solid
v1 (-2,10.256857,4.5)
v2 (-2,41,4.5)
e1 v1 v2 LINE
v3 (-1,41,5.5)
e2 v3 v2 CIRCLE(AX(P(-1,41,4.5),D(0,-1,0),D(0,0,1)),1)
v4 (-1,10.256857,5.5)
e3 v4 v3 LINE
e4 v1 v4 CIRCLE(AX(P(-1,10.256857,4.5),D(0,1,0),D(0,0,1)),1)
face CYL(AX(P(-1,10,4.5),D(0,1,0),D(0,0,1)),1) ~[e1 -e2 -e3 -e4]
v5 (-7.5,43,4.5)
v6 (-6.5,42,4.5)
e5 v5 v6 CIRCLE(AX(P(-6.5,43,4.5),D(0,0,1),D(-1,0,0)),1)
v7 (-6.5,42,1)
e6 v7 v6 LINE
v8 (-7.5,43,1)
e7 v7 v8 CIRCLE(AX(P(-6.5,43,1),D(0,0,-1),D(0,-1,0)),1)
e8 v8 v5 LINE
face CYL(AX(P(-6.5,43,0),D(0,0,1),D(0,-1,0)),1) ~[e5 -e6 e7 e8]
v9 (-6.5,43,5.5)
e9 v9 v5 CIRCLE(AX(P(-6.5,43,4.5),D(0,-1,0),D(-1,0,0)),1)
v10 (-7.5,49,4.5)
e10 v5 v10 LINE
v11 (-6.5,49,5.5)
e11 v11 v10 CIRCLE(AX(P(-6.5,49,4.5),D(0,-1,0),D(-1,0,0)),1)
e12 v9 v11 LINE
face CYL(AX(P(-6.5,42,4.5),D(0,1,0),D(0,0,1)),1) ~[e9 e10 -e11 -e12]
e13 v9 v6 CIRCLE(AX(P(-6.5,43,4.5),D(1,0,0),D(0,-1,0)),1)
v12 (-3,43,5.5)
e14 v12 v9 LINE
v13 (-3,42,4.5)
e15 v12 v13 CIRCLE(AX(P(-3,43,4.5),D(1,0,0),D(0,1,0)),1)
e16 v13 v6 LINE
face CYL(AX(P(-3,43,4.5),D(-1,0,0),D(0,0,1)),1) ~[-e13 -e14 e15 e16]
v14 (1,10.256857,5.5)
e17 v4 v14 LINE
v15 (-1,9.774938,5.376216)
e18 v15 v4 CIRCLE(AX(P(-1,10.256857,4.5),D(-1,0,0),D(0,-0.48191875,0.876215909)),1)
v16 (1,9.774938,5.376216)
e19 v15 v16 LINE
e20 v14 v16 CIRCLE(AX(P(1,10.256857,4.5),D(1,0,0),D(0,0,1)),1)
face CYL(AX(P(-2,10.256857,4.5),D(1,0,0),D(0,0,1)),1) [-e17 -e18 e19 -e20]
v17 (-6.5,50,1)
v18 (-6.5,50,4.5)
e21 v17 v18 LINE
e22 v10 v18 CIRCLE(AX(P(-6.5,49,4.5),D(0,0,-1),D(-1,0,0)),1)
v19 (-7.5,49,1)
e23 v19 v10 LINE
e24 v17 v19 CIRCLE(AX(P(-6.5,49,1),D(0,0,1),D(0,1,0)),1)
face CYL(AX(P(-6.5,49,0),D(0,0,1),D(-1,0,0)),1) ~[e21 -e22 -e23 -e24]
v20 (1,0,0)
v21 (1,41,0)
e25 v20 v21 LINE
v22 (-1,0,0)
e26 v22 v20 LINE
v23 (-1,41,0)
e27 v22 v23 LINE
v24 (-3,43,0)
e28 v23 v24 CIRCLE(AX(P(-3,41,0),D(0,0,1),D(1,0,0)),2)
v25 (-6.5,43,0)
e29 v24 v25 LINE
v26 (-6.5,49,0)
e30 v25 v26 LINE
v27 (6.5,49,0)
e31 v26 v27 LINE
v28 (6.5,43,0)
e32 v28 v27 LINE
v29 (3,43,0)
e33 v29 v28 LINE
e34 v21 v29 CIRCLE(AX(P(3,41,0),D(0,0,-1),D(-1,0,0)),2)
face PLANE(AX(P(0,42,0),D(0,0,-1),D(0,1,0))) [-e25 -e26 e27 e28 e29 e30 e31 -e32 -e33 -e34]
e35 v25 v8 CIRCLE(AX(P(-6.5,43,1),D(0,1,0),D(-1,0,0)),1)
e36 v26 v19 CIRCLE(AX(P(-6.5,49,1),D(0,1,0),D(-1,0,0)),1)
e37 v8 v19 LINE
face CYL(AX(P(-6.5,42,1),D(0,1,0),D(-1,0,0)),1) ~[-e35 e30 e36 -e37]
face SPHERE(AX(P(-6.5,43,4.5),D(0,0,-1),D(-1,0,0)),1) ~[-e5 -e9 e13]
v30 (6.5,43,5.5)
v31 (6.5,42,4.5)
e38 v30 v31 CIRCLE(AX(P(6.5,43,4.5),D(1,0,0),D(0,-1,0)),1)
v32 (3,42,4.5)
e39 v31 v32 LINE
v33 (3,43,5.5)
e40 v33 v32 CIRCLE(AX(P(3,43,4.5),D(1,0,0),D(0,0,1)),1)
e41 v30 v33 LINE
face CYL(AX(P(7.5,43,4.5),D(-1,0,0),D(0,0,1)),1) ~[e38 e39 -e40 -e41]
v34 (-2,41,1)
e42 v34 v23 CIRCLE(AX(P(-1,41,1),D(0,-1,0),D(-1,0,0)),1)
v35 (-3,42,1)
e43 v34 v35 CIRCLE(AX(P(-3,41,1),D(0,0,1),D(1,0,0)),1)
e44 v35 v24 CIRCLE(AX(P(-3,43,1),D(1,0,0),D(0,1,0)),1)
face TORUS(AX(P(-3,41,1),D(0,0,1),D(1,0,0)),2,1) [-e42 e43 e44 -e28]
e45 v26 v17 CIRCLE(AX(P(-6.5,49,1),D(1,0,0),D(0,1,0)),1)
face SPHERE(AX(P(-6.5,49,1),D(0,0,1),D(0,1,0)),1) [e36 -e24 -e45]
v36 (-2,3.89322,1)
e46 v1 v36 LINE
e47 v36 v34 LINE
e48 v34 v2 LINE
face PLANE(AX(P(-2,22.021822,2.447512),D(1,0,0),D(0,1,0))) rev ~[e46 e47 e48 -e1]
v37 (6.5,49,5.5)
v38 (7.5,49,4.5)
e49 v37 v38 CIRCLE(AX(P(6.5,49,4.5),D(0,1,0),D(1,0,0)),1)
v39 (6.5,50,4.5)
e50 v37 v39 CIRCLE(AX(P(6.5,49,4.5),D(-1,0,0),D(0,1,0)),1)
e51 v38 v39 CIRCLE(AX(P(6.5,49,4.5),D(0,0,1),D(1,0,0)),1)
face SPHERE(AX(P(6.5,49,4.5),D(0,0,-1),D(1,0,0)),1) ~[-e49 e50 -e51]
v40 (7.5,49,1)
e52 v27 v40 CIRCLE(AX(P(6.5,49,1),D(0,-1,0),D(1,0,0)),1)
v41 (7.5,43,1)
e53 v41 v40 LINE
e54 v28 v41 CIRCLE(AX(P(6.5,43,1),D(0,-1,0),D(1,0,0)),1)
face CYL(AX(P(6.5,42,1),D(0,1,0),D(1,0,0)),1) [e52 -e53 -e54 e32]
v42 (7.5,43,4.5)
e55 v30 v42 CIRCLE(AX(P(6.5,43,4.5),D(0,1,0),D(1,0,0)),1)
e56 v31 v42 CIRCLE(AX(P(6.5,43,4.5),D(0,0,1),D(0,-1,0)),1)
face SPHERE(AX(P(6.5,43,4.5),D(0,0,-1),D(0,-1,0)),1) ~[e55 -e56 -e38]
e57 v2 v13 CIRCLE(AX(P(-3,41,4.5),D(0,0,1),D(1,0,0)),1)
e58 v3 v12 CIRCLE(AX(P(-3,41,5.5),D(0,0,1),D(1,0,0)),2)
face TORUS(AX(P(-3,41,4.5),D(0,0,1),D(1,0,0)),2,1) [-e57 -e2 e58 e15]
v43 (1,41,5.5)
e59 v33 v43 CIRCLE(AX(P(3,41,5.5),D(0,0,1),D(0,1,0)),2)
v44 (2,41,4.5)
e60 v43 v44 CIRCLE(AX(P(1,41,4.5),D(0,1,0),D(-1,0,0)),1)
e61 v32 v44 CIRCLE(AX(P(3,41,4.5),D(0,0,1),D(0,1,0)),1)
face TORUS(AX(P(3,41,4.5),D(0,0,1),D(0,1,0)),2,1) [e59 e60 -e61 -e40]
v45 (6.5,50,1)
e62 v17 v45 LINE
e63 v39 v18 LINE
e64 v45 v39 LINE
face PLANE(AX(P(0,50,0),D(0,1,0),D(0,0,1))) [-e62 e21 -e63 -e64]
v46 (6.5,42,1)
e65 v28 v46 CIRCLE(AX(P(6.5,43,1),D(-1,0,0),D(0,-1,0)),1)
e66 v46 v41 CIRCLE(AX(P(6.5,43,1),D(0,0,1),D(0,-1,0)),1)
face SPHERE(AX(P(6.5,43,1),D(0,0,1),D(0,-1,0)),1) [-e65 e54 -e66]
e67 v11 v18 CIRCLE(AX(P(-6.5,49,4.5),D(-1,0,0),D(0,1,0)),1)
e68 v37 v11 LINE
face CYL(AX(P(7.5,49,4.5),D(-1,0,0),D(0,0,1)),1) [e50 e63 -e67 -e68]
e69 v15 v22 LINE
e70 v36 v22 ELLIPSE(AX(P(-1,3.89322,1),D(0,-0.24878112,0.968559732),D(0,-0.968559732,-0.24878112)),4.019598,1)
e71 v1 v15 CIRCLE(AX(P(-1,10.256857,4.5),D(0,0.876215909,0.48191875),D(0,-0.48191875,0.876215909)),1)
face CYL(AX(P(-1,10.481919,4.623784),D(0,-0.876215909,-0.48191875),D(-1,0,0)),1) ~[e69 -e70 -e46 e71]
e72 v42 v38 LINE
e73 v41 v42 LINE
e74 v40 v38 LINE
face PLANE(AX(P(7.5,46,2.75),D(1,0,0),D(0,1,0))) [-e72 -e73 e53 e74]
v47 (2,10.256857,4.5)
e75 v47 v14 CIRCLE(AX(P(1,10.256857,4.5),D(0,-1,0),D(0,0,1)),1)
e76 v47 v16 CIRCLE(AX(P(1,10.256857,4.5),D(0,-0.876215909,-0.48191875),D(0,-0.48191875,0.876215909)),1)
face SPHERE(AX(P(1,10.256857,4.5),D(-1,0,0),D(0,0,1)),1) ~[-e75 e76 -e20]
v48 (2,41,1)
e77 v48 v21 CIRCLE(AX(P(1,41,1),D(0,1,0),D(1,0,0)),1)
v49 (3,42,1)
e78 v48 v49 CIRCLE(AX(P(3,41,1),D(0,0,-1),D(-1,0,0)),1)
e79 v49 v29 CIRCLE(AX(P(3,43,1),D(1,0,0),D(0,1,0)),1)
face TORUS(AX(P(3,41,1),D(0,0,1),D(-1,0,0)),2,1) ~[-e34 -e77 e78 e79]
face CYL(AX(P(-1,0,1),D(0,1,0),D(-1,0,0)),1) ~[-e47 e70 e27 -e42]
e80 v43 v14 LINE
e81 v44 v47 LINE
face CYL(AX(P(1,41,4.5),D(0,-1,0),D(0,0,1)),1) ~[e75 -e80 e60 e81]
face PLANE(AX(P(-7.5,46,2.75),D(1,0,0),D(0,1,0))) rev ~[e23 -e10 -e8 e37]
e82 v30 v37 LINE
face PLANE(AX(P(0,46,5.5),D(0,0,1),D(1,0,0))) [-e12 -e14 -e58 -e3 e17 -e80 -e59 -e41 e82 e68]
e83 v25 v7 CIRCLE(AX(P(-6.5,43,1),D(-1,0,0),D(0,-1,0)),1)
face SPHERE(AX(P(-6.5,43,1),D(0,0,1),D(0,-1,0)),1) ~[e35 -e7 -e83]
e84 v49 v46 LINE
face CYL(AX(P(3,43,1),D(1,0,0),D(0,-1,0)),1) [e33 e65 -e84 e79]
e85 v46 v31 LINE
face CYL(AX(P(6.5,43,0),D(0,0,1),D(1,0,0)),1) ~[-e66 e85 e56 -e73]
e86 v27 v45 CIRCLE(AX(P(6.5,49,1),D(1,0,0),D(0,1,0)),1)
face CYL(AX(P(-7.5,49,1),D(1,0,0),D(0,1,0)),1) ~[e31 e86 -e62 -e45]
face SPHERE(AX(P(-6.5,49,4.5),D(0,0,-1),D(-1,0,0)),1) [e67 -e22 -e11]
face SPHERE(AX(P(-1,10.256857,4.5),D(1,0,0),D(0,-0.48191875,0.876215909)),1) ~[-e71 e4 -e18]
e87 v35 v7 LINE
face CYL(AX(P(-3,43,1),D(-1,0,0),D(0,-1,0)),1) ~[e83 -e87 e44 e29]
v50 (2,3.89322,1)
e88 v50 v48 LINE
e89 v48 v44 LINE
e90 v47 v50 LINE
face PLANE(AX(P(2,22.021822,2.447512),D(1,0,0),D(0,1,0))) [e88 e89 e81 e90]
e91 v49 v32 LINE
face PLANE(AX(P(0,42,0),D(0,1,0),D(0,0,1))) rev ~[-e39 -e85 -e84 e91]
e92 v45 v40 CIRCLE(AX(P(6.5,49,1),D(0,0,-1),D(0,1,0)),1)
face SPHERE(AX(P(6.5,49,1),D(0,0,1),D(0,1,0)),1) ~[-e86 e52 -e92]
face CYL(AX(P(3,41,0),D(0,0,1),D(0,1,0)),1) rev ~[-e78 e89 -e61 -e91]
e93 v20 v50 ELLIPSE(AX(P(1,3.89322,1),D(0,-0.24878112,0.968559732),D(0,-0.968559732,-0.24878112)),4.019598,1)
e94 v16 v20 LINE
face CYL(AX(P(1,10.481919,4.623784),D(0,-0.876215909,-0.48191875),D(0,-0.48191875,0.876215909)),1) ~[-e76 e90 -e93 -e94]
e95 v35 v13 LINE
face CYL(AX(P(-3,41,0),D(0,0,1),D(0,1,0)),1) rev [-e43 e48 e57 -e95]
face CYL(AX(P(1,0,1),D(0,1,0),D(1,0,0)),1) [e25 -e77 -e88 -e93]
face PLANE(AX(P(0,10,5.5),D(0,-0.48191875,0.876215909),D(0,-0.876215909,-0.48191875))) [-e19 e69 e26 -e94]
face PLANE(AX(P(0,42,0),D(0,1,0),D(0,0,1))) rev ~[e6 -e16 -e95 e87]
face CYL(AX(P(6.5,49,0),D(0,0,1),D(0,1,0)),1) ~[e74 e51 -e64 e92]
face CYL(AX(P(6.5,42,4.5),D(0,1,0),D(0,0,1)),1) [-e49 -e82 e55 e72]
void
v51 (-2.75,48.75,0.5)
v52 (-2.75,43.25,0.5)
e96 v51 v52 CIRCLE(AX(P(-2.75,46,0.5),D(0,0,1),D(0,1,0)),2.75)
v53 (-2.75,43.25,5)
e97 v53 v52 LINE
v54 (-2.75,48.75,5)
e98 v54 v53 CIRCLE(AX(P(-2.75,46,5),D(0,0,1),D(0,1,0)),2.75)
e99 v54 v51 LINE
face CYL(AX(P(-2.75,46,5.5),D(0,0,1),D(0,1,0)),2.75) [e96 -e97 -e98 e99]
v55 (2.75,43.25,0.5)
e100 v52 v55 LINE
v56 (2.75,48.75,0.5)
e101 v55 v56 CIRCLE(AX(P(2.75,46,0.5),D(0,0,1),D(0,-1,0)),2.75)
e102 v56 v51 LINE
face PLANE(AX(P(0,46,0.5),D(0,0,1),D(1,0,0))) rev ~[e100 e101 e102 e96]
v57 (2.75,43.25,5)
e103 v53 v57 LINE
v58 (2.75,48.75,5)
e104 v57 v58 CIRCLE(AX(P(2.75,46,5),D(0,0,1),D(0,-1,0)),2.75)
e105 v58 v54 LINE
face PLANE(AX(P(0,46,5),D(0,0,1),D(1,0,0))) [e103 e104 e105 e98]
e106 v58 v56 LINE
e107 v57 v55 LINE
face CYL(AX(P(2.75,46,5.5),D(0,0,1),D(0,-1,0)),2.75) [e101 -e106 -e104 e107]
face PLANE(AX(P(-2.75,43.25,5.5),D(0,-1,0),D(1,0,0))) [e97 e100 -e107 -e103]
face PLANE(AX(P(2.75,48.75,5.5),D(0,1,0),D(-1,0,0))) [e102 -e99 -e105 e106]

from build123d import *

# Parameters (mm, degrees)
F1_DEPTH = 2
F0_W     = 8
F0_H     = 5.5
F2_DEPTH = 7.5
F4_DEPTH = 5
F5_DEPTH = 0.5
F6_F1_R  = 1
F6_F2_R  = 1


with BuildPart() as f1:
    # F0 (on Right) → F1 (new body, symmetric)
    with BuildSketch(Plane.YZ):
        Polygon((42, 5.5), (10, 5.5), (0, 0), (42, 0), align=None)
    extrude(amount=F1_DEPTH, both=True)

    # F0 (on Right) → F2 (join, symmetric)
    with BuildSketch(Plane.YZ):
        with Locations((46, 2.75)):
            Rectangle(F0_W, F0_H)
    extrude(amount=F2_DEPTH, both=True)

    # F3 (on face) → F4 (cut)
    with BuildSketch(Plane.XY.offset(5.5)):
        with BuildLine():
            ThreePointArc((-2.75, 48.75), (-5.5, 46), (-2.75, 43.25))
            Line((-2.75, 43.25), (2.75, 43.25))
            ThreePointArc((2.75, 43.25), (5.5, 46), (2.75, 48.75))
            Line((2.75, 48.75), (-2.75, 48.75))
        make_face()
    extrude(amount=-F4_DEPTH, mode=Mode.SUBTRACT)

    # F3 (on face) → F5 (join)
    with BuildSketch(Plane.XY.offset(5.5)):
        with BuildLine():
            ThreePointArc((-2.75, 48.75), (-5.5, 46), (-2.75, 43.25))
            Line((-2.75, 43.25), (2.75, 43.25))
            ThreePointArc((2.75, 43.25), (5.5, 46), (2.75, 48.75))
            Line((2.75, 48.75), (-2.75, 48.75))
        make_face()
    extrude(amount=-F5_DEPTH)

    # F6: fillet of radius 1 on 21 edges, made by hand

    # F6_f1
    f6_f1_edges = [f1.edges().sort_by_distance(p)[0] for p in [
        (2, 42, 2.75),
        (-2, 42, 2.75),
    ]]
    fillet(f6_f1_edges, radius=F6_F1_R)

    # F6_f2
    f6_f2_edges = [f1.edges().sort_by_distance(p)[0] for p in [
        (-7.5, 42, 2.75),
        (-7.5, 50, 2.75),
        (7.5, 50, 2.75),
        (7.5, 42, 2.75),
        (-7.5, 46, 5.5),
        (-5.25, 42, 5.5),
        (-2, 25.5, 5.5),
        (0, 10, 5.5),
        (2, 25.5, 5.5),
        (5.25, 42, 5.5),
        (7.5, 46, 5.5),
        (0, 50, 5.5),
        (2, 5, 2.75),
        (2, 20.5, 0),
        (-2, 5, 2.75),
        (-2, 20.5, 0),
        (0, 50, 0),
        (7.5, 46, 0),
        (-7.5, 46, 0),
        (-2.2928932188, 41.7071067812, 0),
        (2.2928932188, 41.7071067812, 0),
        (2.2928932188, 41.7071067812, 5.5),
        (-2.2928932188, 41.7071067812, 5.5),
    ]]
    fillet(f6_f2_edges, radius=F6_F2_R)


solid = f1.part
